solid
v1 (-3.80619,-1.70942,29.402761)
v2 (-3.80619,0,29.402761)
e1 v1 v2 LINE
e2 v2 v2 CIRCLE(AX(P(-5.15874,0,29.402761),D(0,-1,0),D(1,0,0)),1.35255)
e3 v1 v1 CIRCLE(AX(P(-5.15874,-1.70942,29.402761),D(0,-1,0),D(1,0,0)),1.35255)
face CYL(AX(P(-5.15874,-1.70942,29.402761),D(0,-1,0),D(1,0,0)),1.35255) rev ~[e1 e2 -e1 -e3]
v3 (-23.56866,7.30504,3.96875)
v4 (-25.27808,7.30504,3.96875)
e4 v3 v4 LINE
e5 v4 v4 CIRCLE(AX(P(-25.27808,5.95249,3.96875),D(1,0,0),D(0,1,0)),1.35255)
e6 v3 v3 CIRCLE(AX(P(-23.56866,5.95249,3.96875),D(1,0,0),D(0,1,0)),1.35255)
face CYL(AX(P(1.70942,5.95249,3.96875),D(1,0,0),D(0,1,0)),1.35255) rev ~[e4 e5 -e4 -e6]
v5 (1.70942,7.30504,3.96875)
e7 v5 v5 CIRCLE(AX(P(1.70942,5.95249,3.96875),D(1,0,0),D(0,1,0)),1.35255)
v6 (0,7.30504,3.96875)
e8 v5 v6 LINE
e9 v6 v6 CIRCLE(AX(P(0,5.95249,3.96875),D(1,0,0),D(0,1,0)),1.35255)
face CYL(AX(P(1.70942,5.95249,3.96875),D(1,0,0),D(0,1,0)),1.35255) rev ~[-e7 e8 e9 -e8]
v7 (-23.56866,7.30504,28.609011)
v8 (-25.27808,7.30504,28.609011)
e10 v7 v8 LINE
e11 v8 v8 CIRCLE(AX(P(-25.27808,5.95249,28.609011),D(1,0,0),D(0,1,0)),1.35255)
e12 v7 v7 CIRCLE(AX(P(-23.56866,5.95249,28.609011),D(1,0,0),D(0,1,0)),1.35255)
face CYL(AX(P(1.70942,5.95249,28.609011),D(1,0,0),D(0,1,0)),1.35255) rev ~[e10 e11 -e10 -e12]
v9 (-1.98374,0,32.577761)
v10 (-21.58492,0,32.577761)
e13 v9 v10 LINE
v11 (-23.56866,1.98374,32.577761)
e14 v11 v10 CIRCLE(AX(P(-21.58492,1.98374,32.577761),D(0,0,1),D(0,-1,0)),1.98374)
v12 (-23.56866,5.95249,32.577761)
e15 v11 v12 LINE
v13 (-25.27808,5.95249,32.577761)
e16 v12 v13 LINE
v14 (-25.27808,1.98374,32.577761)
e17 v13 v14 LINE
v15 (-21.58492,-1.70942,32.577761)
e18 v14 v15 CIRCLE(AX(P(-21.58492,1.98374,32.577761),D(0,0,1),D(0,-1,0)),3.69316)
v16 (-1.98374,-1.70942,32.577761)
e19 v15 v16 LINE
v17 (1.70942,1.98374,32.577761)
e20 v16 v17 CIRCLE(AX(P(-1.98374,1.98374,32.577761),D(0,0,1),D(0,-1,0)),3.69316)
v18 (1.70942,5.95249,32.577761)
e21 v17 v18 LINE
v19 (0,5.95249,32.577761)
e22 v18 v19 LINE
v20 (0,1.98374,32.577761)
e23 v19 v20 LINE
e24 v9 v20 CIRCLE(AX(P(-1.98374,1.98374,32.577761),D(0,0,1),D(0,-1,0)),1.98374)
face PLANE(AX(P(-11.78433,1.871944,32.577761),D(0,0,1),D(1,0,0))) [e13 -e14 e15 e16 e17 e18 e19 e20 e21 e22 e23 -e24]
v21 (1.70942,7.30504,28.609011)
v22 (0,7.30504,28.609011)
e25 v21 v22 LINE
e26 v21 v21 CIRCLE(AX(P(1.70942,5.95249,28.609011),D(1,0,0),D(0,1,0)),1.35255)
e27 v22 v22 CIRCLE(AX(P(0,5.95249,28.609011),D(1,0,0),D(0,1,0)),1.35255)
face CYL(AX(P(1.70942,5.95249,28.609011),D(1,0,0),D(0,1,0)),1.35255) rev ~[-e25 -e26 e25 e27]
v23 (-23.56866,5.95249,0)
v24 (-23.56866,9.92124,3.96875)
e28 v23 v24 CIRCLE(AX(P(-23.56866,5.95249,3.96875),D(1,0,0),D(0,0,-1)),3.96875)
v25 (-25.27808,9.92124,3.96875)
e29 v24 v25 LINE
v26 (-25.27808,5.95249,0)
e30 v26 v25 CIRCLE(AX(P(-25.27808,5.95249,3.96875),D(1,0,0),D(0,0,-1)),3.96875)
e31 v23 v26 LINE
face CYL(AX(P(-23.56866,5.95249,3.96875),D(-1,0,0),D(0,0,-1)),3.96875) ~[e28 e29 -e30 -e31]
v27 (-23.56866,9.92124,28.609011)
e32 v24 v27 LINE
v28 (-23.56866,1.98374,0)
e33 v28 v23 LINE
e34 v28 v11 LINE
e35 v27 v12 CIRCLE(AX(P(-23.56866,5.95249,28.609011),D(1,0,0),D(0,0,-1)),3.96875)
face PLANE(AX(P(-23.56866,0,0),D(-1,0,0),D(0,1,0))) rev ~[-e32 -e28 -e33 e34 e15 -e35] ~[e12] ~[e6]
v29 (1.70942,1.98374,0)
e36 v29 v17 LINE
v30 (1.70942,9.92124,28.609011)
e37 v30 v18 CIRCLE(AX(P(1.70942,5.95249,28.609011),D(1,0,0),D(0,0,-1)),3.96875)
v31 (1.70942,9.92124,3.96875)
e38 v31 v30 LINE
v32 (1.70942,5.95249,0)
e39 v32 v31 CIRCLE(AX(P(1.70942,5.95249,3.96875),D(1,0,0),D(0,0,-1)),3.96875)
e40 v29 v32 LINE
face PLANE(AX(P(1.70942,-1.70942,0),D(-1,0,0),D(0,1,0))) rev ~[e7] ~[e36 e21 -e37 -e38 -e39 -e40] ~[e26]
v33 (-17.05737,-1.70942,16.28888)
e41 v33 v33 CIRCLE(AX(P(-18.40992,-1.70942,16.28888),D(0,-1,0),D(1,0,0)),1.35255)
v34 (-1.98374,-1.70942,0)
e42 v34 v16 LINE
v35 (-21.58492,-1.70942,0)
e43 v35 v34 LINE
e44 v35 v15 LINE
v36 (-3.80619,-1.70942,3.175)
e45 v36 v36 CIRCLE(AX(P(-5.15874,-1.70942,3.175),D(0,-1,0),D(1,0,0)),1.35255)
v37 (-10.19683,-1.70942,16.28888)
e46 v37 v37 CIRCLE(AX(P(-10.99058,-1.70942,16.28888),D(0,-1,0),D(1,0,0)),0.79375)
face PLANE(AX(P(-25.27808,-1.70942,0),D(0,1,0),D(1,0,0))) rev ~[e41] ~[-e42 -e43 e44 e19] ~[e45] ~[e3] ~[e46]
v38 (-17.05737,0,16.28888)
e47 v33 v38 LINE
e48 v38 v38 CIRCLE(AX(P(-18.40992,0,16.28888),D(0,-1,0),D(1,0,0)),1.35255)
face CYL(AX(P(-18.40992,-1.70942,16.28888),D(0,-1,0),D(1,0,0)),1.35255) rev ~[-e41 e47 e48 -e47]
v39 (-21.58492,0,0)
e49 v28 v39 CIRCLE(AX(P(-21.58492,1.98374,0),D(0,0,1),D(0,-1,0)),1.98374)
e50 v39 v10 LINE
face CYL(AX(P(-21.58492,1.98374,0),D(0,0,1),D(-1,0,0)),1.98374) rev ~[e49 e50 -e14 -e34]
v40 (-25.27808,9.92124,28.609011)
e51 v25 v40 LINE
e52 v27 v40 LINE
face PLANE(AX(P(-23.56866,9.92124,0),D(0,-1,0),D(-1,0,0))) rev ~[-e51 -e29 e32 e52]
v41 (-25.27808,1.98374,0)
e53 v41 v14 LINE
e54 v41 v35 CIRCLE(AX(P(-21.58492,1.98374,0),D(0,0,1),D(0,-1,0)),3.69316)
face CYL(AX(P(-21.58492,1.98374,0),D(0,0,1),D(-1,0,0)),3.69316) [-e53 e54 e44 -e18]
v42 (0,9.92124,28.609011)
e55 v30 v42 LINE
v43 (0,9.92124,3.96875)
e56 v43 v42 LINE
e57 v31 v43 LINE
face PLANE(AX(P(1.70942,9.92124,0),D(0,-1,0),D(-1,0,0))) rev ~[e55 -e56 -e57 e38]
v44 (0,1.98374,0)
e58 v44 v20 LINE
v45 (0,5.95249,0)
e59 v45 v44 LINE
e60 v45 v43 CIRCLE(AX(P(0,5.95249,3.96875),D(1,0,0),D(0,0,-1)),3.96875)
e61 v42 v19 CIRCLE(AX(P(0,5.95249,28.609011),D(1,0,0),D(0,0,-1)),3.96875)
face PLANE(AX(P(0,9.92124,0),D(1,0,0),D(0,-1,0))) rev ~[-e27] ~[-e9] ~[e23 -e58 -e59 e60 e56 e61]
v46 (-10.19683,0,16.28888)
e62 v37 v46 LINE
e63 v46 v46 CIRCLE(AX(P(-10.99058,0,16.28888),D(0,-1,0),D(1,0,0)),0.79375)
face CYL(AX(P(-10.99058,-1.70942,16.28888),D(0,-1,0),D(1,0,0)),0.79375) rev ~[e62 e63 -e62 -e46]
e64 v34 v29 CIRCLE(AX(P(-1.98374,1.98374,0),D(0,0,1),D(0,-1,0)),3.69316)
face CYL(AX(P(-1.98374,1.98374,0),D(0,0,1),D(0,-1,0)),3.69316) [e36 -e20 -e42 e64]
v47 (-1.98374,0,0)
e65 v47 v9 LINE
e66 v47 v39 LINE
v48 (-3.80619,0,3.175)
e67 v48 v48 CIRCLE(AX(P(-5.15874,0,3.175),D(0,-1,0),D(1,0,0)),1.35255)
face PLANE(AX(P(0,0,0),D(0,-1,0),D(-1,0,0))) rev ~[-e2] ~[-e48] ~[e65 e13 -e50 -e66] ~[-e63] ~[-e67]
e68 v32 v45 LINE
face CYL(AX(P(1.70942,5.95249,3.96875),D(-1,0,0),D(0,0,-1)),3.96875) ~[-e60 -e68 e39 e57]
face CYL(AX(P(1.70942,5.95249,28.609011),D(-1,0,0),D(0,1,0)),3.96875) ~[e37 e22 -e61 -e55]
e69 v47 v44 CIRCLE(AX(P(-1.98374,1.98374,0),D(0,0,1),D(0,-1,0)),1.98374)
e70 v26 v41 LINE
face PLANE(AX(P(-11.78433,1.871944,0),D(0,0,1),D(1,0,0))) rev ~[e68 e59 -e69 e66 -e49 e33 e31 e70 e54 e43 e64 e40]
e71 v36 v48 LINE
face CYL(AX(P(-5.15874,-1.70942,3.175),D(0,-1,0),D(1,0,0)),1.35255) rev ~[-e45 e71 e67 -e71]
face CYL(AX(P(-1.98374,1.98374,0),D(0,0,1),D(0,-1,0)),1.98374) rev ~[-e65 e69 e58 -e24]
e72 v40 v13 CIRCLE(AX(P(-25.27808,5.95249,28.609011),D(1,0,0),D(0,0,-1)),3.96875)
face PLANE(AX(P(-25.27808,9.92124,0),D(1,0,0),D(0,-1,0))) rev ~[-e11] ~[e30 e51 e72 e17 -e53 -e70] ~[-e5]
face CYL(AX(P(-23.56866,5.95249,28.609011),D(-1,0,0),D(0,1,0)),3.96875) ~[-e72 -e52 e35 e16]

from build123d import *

# Parameters (mm, degrees)
F1_DEPTH = 32.5777606
F2_R     = 3.69316
F3_R     = 1.98374
F4_R     = 1.35255
F5_DEPTH = 26.9875
F6_R     = 3.96875
F7_R     = 0.79375
F7_R_2   = 1.35255
F8_DEPTH = 1.70942


with BuildPart() as f1:
    # F0 (on Top) → F1 (new body)
    with BuildSketch(Plane.XY):
        Polygon((0, 9.92124), (0, 0), (-23.56866, 0), (-23.56866, 9.92124), (-25.27808, 9.92124), (-25.27808, -1.70942), (1.70942, -1.70942), (1.70942, 9.92124), align=None)
    extrude(amount=F1_DEPTH)

    # F2
    f2_edges = [f1.edges().sort_by_distance(p)[0] for p in [
        (1.70942, -1.70942, 16.28888),
        (-25.27808, -1.70942, 16.28888),
    ]]
    fillet(f2_edges, radius=F2_R)

    # F3
    f3_edges = [f1.edges().sort_by_distance(p)[0] for p in [
        (0, 0, 16.28888),
        (-23.56866, 0, 16.28888),
    ]]
    fillet(f3_edges, radius=F3_R)

    # F4 (on face) → F5 (cut, through all)
    with BuildSketch(Plane.YZ.offset(1.70942)):
        with Locations((5.95249, 3.96875)):
            Circle(F4_R)
        with Locations((5.95249, 28.6090106)):
            Circle(F4_R)
    extrude(amount=-F5_DEPTH, mode=Mode.SUBTRACT)

    # F6
    f6_edges = [f1.edges().sort_by_distance(p)[0] for p in [
        (0.85471, 9.92124, 32.577761),
        (-24.42337, 9.92124, 32.577761),
        (0.85471, 9.92124, 0),
        (-24.42337, 9.92124, 0),
    ]]
    fillet(f6_edges, radius=F6_R)

    # F7 (on face) → F8 (cut, through all)
    with BuildSketch(Plane.XZ.offset(1.70942)):
        with Locations((-10.99058, 16.2888803)):
            Circle(F7_R)
        with Locations((-18.40992, 16.2888803)):
            Circle(F7_R_2)
        with Locations((-5.15874, 29.4027606)):
            Circle(F7_R_2)
        with Locations((-5.15874, 3.175)):
            Circle(F7_R_2)
    extrude(amount=-F8_DEPTH, mode=Mode.SUBTRACT)


solid = f1.part
